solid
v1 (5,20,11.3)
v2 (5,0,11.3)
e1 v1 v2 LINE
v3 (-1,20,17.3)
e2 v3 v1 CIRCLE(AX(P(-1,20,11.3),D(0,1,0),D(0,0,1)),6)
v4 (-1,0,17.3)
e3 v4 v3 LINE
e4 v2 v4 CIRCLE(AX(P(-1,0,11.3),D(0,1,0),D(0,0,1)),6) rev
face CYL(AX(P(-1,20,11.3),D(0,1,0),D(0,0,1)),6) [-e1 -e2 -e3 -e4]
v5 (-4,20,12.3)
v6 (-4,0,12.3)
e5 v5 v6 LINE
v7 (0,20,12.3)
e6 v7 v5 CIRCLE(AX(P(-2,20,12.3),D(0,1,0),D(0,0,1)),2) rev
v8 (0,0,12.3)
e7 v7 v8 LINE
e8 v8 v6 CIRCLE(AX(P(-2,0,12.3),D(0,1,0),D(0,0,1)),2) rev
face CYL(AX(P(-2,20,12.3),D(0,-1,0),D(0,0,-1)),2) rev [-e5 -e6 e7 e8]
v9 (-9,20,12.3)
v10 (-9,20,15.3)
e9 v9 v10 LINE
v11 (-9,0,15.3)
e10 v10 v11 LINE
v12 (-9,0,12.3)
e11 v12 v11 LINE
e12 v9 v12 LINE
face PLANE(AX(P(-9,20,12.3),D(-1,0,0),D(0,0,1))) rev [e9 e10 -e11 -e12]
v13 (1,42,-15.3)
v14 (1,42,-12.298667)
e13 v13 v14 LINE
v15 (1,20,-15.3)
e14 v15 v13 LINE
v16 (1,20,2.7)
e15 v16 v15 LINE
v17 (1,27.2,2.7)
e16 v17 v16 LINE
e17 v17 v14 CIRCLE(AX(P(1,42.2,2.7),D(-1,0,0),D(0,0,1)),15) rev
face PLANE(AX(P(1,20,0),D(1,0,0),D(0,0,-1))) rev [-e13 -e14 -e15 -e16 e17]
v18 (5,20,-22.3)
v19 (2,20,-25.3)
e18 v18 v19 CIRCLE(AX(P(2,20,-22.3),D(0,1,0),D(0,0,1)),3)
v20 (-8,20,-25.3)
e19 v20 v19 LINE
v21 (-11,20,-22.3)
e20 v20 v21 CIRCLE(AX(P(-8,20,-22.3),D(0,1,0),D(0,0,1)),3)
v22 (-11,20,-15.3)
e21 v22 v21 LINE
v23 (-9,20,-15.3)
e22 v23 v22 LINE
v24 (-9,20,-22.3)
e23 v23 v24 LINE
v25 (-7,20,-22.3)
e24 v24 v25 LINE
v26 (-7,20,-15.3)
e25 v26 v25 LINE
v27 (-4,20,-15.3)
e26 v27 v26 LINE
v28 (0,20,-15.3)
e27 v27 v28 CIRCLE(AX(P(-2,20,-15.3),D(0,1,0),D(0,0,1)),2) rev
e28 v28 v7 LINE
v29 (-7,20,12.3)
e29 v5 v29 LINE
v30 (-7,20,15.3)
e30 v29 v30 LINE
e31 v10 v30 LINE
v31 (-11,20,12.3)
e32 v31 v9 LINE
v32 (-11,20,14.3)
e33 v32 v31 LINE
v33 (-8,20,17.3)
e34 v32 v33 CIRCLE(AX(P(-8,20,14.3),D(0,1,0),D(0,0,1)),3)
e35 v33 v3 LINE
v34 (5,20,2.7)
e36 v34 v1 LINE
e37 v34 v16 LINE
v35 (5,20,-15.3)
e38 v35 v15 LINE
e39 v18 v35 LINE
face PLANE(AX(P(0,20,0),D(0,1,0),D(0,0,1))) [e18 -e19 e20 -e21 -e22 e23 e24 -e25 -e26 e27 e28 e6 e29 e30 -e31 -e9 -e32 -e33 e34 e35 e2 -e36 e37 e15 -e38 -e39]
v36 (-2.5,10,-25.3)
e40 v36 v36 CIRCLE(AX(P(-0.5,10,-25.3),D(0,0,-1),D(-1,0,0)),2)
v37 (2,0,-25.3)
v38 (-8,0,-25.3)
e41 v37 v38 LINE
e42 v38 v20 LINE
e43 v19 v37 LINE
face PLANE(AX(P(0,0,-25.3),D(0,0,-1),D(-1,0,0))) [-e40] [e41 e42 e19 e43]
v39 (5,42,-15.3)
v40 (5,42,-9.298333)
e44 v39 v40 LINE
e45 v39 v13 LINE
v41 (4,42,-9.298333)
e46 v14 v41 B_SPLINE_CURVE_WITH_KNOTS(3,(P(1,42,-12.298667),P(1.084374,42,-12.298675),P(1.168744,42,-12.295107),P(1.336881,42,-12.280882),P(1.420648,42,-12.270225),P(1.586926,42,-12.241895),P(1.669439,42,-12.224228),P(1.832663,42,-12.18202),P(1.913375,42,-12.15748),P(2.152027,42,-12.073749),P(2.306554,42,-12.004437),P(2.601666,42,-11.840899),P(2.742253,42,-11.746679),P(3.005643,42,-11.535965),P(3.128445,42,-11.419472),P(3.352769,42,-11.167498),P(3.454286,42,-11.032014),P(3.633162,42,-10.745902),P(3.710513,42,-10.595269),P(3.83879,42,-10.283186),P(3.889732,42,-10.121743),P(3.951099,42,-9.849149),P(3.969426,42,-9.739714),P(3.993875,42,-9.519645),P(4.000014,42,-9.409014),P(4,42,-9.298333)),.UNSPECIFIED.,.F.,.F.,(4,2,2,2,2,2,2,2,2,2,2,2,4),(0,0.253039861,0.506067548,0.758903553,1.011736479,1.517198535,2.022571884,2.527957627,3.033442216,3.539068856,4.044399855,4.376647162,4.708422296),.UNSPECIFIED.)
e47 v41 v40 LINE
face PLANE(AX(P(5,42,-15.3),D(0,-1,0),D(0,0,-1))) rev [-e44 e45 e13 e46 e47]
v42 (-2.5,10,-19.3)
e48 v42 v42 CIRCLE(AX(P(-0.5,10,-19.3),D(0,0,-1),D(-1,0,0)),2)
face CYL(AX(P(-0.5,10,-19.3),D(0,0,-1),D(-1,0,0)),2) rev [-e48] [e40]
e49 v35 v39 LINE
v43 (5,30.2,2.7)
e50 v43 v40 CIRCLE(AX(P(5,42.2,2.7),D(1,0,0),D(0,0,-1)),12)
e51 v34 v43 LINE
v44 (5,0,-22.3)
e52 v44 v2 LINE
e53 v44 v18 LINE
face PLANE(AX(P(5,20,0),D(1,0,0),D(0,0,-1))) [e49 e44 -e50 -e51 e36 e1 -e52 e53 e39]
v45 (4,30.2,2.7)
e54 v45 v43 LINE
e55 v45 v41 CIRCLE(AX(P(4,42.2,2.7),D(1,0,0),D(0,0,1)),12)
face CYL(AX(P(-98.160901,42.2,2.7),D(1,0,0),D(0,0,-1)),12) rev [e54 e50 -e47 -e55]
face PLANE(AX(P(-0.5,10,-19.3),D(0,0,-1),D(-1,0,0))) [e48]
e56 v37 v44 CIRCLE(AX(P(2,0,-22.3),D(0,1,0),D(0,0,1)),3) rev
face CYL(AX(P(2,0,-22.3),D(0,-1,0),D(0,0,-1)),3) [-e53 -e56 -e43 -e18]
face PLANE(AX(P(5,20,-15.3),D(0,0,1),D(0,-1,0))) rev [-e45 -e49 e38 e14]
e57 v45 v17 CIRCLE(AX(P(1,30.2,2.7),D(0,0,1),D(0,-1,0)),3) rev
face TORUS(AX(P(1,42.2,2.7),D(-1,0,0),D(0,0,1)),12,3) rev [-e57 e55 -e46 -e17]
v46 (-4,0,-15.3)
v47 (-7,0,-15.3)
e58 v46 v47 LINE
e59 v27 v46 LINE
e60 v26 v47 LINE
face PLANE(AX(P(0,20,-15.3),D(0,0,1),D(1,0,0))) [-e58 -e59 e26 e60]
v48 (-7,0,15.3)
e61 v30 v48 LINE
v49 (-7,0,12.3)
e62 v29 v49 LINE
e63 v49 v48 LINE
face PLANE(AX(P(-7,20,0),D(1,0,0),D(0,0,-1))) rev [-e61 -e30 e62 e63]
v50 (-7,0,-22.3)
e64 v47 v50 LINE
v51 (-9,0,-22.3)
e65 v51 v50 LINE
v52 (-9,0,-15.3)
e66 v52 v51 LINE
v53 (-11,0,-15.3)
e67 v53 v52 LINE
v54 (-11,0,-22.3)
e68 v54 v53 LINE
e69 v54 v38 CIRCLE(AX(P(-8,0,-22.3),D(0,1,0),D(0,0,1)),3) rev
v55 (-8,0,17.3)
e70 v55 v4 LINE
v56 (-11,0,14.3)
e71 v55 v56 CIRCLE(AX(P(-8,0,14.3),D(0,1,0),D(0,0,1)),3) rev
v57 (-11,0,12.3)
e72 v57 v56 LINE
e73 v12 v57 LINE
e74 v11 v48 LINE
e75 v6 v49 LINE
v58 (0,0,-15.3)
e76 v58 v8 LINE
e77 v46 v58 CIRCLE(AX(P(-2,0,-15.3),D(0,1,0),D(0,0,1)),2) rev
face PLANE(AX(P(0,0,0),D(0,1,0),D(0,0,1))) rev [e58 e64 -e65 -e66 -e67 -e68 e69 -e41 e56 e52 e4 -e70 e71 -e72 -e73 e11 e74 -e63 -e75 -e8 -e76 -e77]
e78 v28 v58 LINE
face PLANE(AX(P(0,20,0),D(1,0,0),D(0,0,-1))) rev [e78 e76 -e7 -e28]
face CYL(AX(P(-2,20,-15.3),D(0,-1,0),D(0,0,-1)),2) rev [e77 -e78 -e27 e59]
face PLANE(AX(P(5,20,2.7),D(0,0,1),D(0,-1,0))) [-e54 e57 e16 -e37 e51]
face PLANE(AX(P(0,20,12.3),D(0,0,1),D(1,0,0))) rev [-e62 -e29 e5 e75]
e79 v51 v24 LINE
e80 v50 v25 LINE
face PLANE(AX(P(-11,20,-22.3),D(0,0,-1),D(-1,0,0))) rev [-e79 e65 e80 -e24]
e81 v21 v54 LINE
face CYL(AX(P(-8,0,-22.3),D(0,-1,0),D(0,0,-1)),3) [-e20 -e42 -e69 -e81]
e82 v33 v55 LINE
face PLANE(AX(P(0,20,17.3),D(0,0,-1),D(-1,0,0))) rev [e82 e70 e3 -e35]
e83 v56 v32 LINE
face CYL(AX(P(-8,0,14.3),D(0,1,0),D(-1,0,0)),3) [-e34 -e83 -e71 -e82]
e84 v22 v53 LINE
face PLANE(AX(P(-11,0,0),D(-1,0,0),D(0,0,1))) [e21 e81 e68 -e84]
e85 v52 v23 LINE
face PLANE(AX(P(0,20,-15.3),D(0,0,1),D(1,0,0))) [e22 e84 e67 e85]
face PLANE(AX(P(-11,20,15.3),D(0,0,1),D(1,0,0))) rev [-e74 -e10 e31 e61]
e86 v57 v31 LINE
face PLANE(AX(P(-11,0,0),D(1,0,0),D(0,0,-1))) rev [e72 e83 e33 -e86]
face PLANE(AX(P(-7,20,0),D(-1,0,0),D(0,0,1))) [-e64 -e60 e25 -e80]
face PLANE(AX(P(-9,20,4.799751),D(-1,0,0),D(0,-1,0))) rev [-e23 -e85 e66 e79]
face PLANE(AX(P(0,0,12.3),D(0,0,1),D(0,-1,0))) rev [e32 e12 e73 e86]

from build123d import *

# Parameters (mm, degrees)
BOSS_EXTRUDE1_DEPTH  = 20
SKETCH3_W            = 12
SKETCH3_H            = 20
BOSS_EXTRUDE2_DEPTH  = 5
FILLET1_R            = 6
FILLET2_R            = 3
SKETCH4_R            = 2
CUT_EXTRUDE1_DEPTH   = 6
SKETCH5_W            = 2
SKETCH5_H            = 20
SKETCH5_W_2          = 3
BOSS_EXTRUDE3_DEPTH  = 4
SKETCH6_W            = 2
SKETCH6_H            = 20
BOSS_EXTRUDE4_DEPTH  = 3
SKETCH7_W            = 2
SKETCH7_H            = 20
BOSS_EXTRUDE5_DEPTH  = 7
FILLET3_R            = 3
SKETCH8_W            = 18
SKETCH8_H            = 22
BOSS_EXTRUDE6_DEPTH  = 5
CUT_EXTRUDE2_START   = -4
CUT_EXTRUDE2_DEPTH   = 40.285832851
CUT_EXTRUDE3_DEPTH   = 36.285832851
FILLET4_R            = 3
SKETCH11_W           = 18
SKETCH11_H           = 22
CUT_EXTRUDE4_DEPTH   = 1
FILLET5_R            = 3
FILLET4_OF_MIRROR1_R = 3
SKETCH12_W           = 16.003556493
SKETCH12_H           = 33.094462643
CUT_EXTRUDE5_DEPTH   = 22


with BuildPart() as part:
    # Sketch1 → Boss-Extrude1 (new body)
    with BuildSketch(Plane(origin=(0, 0, 0), x_dir=(1, 0, 0), z_dir=(0, 1, 0))):
        with BuildLine():
            Line((0, 15.3), (0, -12.3))
            ThreePointArc((0, -12.3), (-2, -14.3), (-4, -12.3))
            Line((-4, -12.3), (-7, -12.3))
            Line((-7, -12.3), (-7, -17.3))
            Line((-7, -17.3), (5, -17.3))
            Line((5, -17.3), (5, 20.3))
            Line((5, 20.3), (-7, 20.3))
            Line((-7, 20.3), (-7, 15.3))
            Line((-7, 15.3), (-4, 15.3))
            ThreePointArc((-4, 15.3), (-2, 17.3), (0, 15.3))
        make_face()
    extrude(amount=BOSS_EXTRUDE1_DEPTH)

    # Sketch3 → Boss-Extrude2 (add)
    with BuildSketch(Plane(origin=(0, 0, -20.3), x_dir=(-1, 0, 0), z_dir=(0, 0, -1))):
        with Locations((1, 10)):
            Rectangle(SKETCH3_W, SKETCH3_H)
    extrude(amount=BOSS_EXTRUDE2_DEPTH)

    # Fillet1
    fillet1_edges = [part.edges().sort_by_distance(p)[0] for p in [
        (5, 10, 17.3),
    ]]
    fillet(fillet1_edges, radius=FILLET1_R)

    # Fillet2
    fillet2_edges = [part.edges().sort_by_distance(p)[0] for p in [
        (5, 10, -25.3),
    ]]
    fillet(fillet2_edges, radius=FILLET2_R)

    # Sketch4 → Cut-Extrude1 (cut)
    with BuildSketch(Plane(origin=(0, 0, -25.3), x_dir=(-1, 0, 0), z_dir=(0, 0, -1))):
        with Locations((0.5, 10)):
            Circle(SKETCH4_R)
    extrude(amount=-CUT_EXTRUDE1_DEPTH, mode=Mode.SUBTRACT)

    # Sketch5 → Boss-Extrude3 (add)
    with BuildSketch(Plane.ZY.offset(7)):
        with Locations((16.3, 10)):
            Rectangle(SKETCH5_W, SKETCH5_H)
        with Locations((-23.8, 10)):
            Rectangle(SKETCH5_W_2, SKETCH5_H)
    extrude(amount=BOSS_EXTRUDE3_DEPTH)

    # Sketch6 → Boss-Extrude4 (add)
    with BuildSketch(Plane(origin=(0, 0, 15.3), x_dir=(-1, 0, 0), z_dir=(0, 0, -1))):
        with Locations((10, 10)):
            Rectangle(SKETCH6_W, SKETCH6_H)
    extrude(amount=BOSS_EXTRUDE4_DEPTH)

    # Sketch7 → Boss-Extrude5 (add)
    with BuildSketch(Plane.XY.offset(-22.3)):
        with Locations((-10, 10)):
            Rectangle(SKETCH7_W, SKETCH7_H)
    extrude(amount=BOSS_EXTRUDE5_DEPTH)

    # Fillet3
    fillet3_edges = [part.edges().sort_by_distance(p)[0] for p in [
        (-11, 10, 17.3),
        (-11, 10, -25.3),
    ]]
    fillet(fillet3_edges, radius=FILLET3_R)

    # Sketch8 → Boss-Extrude6 (add)
    with BuildSketch(Plane.ZY):
        with Locations((-6.3, -11)):
            Rectangle(SKETCH8_W, SKETCH8_H)
    boss_extrude6 = extrude(amount=-BOSS_EXTRUDE6_DEPTH)

    # Sketch9 → Cut-Extrude2 (cut)
    with BuildSketch(Plane.ZY.offset(CUT_EXTRUDE2_START)):
        with BuildLine():
            Line((2.7, -10.2), (2.7, -7.2))
            ThreePointArc((2.7, -7.2), (-7.835653753, -11.522921748), (-12.298666607, -22))
            Line((-12.298666607, -22), (-9.298333218, -22))
            ThreePointArc((-9.298333218, -22), (-5.714273587, -13.644300146), (2.7, -10.2))
        make_face()
    cut_extrude2 = extrude(amount=CUT_EXTRUDE2_DEPTH, mode=Mode.SUBTRACT)

    # Sketch9<3> → Cut-Extrude3 (cut, symmetric)
    with BuildSketch(Plane.ZY):
        with BuildLine():
            Line((2.7, -22), (2.7, -10.2))
            ThreePointArc((2.7, -10.2), (-5.714273587, -13.644300146), (-9.298333218, -22))
            Line((-9.298333218, -22), (2.7, -22))
        make_face()
    cut_extrude3 = extrude(amount=CUT_EXTRUDE3_DEPTH, both=True, mode=Mode.SUBTRACT)

    # Fillet4
    fillet4_edges = [part.edges().sort_by_distance(p)[0] for p in [
        (4, -11.522921748, -7.835653753),
    ]]
    fillet(fillet4_edges, radius=FILLET4_R - 0.0001)  # a hair under: the kernel refuses the full size

    # Sketch11 → Cut-Extrude4 (cut)
    with BuildSketch(Plane.ZY):
        with Locations((-6.3, -11)):
            Rectangle(SKETCH11_W, SKETCH11_H)
    cut_extrude4 = extrude(amount=-CUT_EXTRUDE4_DEPTH, mode=Mode.SUBTRACT)

    # Fillet5
    fillet5_edges = [part.edges().sort_by_distance(p)[0] for p in [
        (3, 0, -15.3),
        (3, 0, 2.7),
    ]]
    fillet(fillet5_edges, radius=FILLET5_R)

    # Mirror1: Boss-Extrude6, Cut-Extrude2, Cut-Extrude3, Cut-Extrude4 across plane
    add(boss_extrude6.mirror(Plane(origin=(0, 10, 0), x_dir=(0, 0, 1), z_dir=(0, -1, 0))))
    add(cut_extrude2.mirror(Plane(origin=(0, 10, 0), x_dir=(0, 0, 1), z_dir=(0, -1, 0))), mode=Mode.SUBTRACT)
    add(cut_extrude3.mirror(Plane(origin=(0, 10, 0), x_dir=(0, 0, 1), z_dir=(0, -1, 0))), mode=Mode.SUBTRACT)
    add(cut_extrude4.mirror(Plane(origin=(0, 10, 0), x_dir=(0, 0, 1), z_dir=(0, -1, 0))), mode=Mode.SUBTRACT)

    # Fillet4 of Mirror1
    fillet4_of_mirror1_edges = [part.edges().sort_by_distance(p)[0] for p in [
        (4, 31.522921748, -7.835653753),
    ]]
    fillet(fillet4_of_mirror1_edges, radius=FILLET4_OF_MIRROR1_R - 0.0001)  # a hair under: the kernel refuses the full size

    # Sketch12 → Cut-Extrude5 (cut)
    with BuildSketch(Plane.XZ.offset(22)):
        with Locations((1.208141139, -2.187750571)):
            Rectangle(SKETCH12_W, SKETCH12_H)
    extrude(amount=-CUT_EXTRUDE5_DEPTH, mode=Mode.SUBTRACT)


solid = part.part
